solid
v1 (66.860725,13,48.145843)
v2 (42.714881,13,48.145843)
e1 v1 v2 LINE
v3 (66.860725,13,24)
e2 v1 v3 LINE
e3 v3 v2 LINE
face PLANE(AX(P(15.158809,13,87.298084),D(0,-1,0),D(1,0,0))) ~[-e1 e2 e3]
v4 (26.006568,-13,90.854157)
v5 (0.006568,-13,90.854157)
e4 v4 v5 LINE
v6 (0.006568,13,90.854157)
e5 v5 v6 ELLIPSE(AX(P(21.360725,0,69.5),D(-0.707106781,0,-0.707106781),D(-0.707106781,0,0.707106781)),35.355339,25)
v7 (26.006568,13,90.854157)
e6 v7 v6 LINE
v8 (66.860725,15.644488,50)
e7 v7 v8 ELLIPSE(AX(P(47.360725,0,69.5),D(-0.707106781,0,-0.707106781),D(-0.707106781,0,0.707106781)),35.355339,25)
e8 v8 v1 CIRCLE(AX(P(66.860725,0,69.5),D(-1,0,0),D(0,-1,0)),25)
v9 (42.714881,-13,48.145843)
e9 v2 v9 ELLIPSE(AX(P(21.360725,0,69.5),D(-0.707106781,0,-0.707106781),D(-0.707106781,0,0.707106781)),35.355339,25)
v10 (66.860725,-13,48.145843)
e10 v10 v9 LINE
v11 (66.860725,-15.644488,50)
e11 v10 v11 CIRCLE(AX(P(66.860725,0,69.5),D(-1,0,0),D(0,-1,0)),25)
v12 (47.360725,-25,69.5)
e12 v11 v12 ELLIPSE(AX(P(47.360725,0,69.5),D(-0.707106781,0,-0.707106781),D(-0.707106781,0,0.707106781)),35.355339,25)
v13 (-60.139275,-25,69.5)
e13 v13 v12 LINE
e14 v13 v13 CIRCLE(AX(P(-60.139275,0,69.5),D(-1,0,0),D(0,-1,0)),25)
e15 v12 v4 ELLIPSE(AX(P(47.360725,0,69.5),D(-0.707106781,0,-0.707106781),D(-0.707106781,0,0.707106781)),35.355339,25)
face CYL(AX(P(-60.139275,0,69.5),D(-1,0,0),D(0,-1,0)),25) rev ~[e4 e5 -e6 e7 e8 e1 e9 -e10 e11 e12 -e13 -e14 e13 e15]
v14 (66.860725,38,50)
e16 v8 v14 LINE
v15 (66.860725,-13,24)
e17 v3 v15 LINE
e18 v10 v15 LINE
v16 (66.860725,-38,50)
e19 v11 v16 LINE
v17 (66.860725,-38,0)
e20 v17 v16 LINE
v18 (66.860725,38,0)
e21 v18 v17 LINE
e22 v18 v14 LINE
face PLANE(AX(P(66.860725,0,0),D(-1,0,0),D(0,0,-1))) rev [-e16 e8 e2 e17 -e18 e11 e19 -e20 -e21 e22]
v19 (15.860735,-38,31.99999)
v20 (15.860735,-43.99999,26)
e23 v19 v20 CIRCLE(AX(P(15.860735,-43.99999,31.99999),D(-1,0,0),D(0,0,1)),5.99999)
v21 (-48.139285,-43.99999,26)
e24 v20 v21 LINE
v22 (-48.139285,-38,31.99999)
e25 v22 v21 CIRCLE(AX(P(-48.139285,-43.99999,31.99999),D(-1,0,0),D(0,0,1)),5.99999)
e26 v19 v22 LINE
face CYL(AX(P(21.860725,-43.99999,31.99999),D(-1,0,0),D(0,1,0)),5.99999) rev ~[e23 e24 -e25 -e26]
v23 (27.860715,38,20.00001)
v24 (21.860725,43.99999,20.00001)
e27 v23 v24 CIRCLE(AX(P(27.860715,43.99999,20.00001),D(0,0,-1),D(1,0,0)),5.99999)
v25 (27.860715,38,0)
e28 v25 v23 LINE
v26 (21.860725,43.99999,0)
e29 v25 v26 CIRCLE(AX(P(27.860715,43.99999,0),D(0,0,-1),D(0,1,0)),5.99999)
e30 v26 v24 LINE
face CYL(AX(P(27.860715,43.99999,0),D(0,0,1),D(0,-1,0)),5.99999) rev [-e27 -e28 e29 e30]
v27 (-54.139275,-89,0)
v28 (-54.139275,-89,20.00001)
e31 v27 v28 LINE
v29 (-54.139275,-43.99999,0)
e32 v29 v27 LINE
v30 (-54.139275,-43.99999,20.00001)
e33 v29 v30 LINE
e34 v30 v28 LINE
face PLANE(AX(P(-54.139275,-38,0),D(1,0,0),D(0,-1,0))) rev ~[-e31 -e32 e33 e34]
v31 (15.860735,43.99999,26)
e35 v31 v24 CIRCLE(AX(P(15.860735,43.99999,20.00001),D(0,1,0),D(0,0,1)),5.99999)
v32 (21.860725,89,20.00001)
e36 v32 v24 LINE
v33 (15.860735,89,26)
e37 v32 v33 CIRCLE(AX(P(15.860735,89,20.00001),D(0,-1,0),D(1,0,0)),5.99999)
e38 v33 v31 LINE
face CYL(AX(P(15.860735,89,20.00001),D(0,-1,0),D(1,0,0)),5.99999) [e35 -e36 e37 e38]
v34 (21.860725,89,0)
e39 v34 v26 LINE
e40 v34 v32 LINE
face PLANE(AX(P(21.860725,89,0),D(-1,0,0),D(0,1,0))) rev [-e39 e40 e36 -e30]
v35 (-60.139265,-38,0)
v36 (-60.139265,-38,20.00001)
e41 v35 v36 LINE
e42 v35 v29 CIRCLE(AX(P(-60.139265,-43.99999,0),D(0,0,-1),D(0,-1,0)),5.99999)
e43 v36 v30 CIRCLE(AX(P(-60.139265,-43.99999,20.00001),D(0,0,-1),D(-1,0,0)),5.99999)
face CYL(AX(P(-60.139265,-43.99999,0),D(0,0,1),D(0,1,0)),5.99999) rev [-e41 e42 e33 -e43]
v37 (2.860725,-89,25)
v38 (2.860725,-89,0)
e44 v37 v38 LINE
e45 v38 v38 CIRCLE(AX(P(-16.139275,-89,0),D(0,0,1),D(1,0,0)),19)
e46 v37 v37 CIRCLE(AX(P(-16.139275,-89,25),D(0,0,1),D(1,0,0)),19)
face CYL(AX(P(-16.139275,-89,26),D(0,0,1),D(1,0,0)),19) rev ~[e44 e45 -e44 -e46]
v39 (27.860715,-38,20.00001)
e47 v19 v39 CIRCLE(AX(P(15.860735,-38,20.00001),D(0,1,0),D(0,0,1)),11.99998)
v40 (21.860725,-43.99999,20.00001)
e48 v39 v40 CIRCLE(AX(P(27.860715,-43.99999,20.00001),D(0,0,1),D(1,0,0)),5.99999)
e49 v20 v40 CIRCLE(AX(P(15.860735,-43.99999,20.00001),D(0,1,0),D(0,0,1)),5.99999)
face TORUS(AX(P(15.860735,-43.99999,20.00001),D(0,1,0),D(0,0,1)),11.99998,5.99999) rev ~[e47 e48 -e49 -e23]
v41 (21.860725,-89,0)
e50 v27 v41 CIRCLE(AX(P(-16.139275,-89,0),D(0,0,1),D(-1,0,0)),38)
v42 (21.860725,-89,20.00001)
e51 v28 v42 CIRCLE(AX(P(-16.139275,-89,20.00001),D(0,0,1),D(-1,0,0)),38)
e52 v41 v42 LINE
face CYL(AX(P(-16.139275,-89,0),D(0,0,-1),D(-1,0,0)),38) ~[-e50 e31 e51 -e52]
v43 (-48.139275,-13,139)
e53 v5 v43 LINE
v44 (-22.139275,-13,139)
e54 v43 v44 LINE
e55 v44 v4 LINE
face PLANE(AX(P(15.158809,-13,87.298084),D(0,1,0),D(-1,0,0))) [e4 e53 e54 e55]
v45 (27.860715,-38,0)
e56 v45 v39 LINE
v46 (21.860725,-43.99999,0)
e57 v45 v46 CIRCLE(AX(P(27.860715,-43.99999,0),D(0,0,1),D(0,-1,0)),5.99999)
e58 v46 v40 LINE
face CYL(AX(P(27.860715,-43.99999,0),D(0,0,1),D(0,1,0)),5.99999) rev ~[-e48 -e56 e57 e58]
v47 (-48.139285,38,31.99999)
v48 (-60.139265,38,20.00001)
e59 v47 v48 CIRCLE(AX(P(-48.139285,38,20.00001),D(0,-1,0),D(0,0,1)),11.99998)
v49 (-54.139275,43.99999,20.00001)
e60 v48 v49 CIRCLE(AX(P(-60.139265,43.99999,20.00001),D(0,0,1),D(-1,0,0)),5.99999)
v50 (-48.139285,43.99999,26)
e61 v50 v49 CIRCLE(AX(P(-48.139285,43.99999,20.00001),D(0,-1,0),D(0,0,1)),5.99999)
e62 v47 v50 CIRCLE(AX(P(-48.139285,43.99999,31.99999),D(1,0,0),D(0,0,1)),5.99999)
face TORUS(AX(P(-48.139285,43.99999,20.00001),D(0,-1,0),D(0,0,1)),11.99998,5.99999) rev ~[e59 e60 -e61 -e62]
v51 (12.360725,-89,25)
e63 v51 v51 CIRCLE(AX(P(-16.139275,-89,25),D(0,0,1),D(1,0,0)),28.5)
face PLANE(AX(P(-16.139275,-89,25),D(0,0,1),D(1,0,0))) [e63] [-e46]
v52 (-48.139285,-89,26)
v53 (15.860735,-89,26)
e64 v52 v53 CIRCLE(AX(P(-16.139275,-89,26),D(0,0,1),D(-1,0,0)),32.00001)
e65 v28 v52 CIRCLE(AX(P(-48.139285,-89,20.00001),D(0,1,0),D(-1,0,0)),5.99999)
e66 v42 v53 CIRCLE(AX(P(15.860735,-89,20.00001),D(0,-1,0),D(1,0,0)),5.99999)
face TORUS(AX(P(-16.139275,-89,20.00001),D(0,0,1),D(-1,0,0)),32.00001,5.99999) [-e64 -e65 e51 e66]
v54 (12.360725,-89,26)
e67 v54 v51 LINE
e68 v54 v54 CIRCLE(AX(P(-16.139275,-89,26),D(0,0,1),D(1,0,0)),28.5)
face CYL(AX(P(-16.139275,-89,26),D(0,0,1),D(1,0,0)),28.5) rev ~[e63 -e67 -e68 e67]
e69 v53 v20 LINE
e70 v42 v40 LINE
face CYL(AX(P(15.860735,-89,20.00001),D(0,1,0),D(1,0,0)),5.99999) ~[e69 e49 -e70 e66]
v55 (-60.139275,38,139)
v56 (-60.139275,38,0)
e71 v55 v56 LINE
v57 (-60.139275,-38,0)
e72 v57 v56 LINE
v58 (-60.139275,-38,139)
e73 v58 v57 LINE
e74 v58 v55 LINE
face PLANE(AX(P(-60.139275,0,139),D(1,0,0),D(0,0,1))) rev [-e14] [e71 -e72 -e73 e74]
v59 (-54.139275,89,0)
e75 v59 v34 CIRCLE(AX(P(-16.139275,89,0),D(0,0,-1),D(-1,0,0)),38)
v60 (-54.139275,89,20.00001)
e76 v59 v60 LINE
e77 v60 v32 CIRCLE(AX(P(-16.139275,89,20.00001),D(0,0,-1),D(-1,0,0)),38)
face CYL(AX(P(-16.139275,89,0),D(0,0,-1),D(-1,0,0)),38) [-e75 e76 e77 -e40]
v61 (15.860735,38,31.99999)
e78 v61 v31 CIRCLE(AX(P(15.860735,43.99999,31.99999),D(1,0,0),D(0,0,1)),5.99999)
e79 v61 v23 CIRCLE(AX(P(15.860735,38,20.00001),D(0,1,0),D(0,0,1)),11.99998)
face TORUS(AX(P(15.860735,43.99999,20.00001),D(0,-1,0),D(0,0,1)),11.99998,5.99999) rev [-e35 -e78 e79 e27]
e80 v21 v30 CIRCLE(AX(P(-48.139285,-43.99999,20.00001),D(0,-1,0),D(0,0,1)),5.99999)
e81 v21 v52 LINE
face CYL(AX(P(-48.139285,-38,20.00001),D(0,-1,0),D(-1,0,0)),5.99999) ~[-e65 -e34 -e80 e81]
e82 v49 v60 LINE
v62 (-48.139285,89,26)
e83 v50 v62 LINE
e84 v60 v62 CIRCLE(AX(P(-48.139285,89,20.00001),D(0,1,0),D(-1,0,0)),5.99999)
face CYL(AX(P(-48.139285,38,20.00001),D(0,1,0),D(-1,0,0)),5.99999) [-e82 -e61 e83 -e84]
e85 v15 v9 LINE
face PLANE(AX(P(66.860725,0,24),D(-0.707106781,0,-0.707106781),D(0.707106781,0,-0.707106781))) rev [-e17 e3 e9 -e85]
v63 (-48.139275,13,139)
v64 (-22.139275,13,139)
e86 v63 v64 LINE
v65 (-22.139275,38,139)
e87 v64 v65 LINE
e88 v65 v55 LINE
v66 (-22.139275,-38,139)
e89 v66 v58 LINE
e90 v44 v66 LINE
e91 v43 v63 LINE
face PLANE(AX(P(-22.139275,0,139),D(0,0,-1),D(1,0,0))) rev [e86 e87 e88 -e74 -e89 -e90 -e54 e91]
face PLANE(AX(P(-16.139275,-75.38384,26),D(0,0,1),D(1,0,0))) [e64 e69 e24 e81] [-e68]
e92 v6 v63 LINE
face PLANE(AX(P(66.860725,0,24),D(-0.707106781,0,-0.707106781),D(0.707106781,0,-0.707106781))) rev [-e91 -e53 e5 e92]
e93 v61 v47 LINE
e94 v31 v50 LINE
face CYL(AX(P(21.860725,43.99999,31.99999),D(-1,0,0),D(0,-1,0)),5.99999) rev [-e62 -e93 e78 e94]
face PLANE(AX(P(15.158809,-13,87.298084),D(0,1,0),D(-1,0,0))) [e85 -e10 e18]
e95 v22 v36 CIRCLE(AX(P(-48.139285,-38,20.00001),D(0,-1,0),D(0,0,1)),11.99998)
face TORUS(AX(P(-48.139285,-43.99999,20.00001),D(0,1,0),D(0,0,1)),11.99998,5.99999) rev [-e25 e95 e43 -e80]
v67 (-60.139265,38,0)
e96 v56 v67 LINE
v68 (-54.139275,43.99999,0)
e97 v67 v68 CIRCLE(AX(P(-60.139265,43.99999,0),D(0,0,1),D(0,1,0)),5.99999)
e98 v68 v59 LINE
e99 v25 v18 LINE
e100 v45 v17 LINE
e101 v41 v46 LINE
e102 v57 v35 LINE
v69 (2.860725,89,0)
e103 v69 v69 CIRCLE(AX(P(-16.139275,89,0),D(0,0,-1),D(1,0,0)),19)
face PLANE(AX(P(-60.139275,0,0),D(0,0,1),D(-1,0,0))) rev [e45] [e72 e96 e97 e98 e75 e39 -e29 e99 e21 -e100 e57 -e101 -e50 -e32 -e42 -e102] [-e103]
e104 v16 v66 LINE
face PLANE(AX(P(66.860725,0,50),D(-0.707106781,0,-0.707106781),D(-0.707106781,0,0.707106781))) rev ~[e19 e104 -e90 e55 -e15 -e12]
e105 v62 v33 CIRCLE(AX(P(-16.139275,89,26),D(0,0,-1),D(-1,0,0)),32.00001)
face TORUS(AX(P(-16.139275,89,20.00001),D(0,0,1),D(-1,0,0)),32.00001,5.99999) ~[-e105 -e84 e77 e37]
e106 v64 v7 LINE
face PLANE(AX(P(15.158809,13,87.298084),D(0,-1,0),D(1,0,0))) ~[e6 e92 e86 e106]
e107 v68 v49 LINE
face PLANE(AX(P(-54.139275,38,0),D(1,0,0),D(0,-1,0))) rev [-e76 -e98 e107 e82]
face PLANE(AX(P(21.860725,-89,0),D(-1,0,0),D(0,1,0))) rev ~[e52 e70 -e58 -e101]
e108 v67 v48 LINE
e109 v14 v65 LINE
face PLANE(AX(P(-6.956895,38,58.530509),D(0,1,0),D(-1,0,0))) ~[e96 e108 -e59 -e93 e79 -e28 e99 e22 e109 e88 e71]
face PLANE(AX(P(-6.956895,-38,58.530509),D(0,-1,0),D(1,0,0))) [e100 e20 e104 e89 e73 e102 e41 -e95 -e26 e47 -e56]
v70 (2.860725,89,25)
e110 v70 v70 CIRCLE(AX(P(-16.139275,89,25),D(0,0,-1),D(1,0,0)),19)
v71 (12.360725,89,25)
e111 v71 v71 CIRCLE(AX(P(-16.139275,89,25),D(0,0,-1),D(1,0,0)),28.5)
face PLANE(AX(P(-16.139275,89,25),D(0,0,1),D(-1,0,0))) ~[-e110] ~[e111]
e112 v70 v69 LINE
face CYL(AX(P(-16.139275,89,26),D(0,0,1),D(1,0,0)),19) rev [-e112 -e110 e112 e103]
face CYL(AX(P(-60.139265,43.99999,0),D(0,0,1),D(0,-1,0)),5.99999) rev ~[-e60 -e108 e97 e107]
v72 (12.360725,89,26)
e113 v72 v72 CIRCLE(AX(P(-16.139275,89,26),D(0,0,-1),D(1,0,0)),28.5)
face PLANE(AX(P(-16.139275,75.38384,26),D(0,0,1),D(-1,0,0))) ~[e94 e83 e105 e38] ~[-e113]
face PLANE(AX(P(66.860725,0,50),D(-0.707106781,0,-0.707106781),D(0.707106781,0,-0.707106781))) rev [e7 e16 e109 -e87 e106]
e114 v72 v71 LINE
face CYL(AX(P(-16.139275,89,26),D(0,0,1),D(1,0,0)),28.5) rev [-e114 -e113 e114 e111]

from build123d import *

# Parameters (mm, degrees)
F1_DEPTH  = 38
F3_DEPTH  = 13
F5_DEPTH  = 26
F6_R      = 19
F7_DEPTH  = 26.001
F6_R_2    = 28.5
F8_DEPTH  = 1
F9_R      = 5.99999
F11_R     = 25
F12_DEPTH = 127.001


# Not quite as in the source:
# - a fillet or chamfer is up to 0.001 mm smaller than in the source, because OpenCascade refuses the exact size


with BuildPart() as f1:
    # F0 (on Front) → F1 (new body)
    with BuildSketch(Plane.XZ):
        Polygon((-60.1392750332, 139), (-60.1392750332, 0), (66.8607249668, 0), (66.8607249668, 50), (-22.1392750332, 139), align=None)
    extrude(amount=F1_DEPTH)

    # F2 (on face) → F3 (cut)
    with BuildSketch(Plane(origin=(0, 0, 0), x_dir=(-1, 0, 0), z_dir=(0, 1, 0))):
        Polygon((-66.8607249668, 24), (48.1392750332, 139), (22.1392750332, 139), (-66.8607249668, 50), align=None)
    extrude(amount=-F3_DEPTH, mode=Mode.SUBTRACT)

    # F4 (on Top) → F5 (join)
    with BuildSketch(Plane.XY):
        with BuildLine():
            Line((21.8607249668, -38), (-54.1392750332, -38))
            Line((-54.1392750332, -38), (-54.1392750332, -89))
            ThreePointArc((-54.1392750332, -89), (-16.1392750332, -127), (21.8607249668, -89))
            Line((21.8607249668, -89), (21.8607249668, -38))
        make_face()
    extrude(amount=F5_DEPTH)

    # F6 (on face) → F7 (cut, through all)
    with BuildSketch(Plane.XY.offset(26)):
        with Locations((-16.1392750332, -89)):
            Circle(F6_R)
    extrude(amount=-F7_DEPTH, mode=Mode.SUBTRACT)

    # F6 (on face) → F8 (cut)
    with BuildSketch(Plane.XY.offset(26)):
        with Locations((-16.1392750332, -89)):
            Circle(F6_R_2)
        with Locations((-16.1392750332, -89)):
            Circle(F6_R, mode=Mode.SUBTRACT)
    extrude(amount=-F8_DEPTH, mode=Mode.SUBTRACT)

    # F9 (radius 6 in the source; OpenCascade refuses exactly that, so slightly less here)
    f9_edges = [f1.edges().sort_by_distance(p)[0] for p in [
        (-16.139275, -38, 26),
        (21.860725, -38, 13),
        (-54.139275, -38, 13),
        (-54.139275, -63.5, 26),
    ]]
    fillet(f9_edges, radius=F9_R)

    # F10: F1 across plane


with BuildPart() as f1_1:
    add(f1.part)
    add(f1.part.mirror(Plane.XZ))

    # F11 (on face) → F12 (cut, through all)
    with BuildSketch(Plane(origin=(-60.1392750332, 0, 0), x_dir=(0, -1, 0), z_dir=(-1, 0, 0))):
        with Locations((0, 69.5)):
            Circle(F11_R)
    extrude(amount=-F12_DEPTH, mode=Mode.SUBTRACT)


solid = f1_1.part
